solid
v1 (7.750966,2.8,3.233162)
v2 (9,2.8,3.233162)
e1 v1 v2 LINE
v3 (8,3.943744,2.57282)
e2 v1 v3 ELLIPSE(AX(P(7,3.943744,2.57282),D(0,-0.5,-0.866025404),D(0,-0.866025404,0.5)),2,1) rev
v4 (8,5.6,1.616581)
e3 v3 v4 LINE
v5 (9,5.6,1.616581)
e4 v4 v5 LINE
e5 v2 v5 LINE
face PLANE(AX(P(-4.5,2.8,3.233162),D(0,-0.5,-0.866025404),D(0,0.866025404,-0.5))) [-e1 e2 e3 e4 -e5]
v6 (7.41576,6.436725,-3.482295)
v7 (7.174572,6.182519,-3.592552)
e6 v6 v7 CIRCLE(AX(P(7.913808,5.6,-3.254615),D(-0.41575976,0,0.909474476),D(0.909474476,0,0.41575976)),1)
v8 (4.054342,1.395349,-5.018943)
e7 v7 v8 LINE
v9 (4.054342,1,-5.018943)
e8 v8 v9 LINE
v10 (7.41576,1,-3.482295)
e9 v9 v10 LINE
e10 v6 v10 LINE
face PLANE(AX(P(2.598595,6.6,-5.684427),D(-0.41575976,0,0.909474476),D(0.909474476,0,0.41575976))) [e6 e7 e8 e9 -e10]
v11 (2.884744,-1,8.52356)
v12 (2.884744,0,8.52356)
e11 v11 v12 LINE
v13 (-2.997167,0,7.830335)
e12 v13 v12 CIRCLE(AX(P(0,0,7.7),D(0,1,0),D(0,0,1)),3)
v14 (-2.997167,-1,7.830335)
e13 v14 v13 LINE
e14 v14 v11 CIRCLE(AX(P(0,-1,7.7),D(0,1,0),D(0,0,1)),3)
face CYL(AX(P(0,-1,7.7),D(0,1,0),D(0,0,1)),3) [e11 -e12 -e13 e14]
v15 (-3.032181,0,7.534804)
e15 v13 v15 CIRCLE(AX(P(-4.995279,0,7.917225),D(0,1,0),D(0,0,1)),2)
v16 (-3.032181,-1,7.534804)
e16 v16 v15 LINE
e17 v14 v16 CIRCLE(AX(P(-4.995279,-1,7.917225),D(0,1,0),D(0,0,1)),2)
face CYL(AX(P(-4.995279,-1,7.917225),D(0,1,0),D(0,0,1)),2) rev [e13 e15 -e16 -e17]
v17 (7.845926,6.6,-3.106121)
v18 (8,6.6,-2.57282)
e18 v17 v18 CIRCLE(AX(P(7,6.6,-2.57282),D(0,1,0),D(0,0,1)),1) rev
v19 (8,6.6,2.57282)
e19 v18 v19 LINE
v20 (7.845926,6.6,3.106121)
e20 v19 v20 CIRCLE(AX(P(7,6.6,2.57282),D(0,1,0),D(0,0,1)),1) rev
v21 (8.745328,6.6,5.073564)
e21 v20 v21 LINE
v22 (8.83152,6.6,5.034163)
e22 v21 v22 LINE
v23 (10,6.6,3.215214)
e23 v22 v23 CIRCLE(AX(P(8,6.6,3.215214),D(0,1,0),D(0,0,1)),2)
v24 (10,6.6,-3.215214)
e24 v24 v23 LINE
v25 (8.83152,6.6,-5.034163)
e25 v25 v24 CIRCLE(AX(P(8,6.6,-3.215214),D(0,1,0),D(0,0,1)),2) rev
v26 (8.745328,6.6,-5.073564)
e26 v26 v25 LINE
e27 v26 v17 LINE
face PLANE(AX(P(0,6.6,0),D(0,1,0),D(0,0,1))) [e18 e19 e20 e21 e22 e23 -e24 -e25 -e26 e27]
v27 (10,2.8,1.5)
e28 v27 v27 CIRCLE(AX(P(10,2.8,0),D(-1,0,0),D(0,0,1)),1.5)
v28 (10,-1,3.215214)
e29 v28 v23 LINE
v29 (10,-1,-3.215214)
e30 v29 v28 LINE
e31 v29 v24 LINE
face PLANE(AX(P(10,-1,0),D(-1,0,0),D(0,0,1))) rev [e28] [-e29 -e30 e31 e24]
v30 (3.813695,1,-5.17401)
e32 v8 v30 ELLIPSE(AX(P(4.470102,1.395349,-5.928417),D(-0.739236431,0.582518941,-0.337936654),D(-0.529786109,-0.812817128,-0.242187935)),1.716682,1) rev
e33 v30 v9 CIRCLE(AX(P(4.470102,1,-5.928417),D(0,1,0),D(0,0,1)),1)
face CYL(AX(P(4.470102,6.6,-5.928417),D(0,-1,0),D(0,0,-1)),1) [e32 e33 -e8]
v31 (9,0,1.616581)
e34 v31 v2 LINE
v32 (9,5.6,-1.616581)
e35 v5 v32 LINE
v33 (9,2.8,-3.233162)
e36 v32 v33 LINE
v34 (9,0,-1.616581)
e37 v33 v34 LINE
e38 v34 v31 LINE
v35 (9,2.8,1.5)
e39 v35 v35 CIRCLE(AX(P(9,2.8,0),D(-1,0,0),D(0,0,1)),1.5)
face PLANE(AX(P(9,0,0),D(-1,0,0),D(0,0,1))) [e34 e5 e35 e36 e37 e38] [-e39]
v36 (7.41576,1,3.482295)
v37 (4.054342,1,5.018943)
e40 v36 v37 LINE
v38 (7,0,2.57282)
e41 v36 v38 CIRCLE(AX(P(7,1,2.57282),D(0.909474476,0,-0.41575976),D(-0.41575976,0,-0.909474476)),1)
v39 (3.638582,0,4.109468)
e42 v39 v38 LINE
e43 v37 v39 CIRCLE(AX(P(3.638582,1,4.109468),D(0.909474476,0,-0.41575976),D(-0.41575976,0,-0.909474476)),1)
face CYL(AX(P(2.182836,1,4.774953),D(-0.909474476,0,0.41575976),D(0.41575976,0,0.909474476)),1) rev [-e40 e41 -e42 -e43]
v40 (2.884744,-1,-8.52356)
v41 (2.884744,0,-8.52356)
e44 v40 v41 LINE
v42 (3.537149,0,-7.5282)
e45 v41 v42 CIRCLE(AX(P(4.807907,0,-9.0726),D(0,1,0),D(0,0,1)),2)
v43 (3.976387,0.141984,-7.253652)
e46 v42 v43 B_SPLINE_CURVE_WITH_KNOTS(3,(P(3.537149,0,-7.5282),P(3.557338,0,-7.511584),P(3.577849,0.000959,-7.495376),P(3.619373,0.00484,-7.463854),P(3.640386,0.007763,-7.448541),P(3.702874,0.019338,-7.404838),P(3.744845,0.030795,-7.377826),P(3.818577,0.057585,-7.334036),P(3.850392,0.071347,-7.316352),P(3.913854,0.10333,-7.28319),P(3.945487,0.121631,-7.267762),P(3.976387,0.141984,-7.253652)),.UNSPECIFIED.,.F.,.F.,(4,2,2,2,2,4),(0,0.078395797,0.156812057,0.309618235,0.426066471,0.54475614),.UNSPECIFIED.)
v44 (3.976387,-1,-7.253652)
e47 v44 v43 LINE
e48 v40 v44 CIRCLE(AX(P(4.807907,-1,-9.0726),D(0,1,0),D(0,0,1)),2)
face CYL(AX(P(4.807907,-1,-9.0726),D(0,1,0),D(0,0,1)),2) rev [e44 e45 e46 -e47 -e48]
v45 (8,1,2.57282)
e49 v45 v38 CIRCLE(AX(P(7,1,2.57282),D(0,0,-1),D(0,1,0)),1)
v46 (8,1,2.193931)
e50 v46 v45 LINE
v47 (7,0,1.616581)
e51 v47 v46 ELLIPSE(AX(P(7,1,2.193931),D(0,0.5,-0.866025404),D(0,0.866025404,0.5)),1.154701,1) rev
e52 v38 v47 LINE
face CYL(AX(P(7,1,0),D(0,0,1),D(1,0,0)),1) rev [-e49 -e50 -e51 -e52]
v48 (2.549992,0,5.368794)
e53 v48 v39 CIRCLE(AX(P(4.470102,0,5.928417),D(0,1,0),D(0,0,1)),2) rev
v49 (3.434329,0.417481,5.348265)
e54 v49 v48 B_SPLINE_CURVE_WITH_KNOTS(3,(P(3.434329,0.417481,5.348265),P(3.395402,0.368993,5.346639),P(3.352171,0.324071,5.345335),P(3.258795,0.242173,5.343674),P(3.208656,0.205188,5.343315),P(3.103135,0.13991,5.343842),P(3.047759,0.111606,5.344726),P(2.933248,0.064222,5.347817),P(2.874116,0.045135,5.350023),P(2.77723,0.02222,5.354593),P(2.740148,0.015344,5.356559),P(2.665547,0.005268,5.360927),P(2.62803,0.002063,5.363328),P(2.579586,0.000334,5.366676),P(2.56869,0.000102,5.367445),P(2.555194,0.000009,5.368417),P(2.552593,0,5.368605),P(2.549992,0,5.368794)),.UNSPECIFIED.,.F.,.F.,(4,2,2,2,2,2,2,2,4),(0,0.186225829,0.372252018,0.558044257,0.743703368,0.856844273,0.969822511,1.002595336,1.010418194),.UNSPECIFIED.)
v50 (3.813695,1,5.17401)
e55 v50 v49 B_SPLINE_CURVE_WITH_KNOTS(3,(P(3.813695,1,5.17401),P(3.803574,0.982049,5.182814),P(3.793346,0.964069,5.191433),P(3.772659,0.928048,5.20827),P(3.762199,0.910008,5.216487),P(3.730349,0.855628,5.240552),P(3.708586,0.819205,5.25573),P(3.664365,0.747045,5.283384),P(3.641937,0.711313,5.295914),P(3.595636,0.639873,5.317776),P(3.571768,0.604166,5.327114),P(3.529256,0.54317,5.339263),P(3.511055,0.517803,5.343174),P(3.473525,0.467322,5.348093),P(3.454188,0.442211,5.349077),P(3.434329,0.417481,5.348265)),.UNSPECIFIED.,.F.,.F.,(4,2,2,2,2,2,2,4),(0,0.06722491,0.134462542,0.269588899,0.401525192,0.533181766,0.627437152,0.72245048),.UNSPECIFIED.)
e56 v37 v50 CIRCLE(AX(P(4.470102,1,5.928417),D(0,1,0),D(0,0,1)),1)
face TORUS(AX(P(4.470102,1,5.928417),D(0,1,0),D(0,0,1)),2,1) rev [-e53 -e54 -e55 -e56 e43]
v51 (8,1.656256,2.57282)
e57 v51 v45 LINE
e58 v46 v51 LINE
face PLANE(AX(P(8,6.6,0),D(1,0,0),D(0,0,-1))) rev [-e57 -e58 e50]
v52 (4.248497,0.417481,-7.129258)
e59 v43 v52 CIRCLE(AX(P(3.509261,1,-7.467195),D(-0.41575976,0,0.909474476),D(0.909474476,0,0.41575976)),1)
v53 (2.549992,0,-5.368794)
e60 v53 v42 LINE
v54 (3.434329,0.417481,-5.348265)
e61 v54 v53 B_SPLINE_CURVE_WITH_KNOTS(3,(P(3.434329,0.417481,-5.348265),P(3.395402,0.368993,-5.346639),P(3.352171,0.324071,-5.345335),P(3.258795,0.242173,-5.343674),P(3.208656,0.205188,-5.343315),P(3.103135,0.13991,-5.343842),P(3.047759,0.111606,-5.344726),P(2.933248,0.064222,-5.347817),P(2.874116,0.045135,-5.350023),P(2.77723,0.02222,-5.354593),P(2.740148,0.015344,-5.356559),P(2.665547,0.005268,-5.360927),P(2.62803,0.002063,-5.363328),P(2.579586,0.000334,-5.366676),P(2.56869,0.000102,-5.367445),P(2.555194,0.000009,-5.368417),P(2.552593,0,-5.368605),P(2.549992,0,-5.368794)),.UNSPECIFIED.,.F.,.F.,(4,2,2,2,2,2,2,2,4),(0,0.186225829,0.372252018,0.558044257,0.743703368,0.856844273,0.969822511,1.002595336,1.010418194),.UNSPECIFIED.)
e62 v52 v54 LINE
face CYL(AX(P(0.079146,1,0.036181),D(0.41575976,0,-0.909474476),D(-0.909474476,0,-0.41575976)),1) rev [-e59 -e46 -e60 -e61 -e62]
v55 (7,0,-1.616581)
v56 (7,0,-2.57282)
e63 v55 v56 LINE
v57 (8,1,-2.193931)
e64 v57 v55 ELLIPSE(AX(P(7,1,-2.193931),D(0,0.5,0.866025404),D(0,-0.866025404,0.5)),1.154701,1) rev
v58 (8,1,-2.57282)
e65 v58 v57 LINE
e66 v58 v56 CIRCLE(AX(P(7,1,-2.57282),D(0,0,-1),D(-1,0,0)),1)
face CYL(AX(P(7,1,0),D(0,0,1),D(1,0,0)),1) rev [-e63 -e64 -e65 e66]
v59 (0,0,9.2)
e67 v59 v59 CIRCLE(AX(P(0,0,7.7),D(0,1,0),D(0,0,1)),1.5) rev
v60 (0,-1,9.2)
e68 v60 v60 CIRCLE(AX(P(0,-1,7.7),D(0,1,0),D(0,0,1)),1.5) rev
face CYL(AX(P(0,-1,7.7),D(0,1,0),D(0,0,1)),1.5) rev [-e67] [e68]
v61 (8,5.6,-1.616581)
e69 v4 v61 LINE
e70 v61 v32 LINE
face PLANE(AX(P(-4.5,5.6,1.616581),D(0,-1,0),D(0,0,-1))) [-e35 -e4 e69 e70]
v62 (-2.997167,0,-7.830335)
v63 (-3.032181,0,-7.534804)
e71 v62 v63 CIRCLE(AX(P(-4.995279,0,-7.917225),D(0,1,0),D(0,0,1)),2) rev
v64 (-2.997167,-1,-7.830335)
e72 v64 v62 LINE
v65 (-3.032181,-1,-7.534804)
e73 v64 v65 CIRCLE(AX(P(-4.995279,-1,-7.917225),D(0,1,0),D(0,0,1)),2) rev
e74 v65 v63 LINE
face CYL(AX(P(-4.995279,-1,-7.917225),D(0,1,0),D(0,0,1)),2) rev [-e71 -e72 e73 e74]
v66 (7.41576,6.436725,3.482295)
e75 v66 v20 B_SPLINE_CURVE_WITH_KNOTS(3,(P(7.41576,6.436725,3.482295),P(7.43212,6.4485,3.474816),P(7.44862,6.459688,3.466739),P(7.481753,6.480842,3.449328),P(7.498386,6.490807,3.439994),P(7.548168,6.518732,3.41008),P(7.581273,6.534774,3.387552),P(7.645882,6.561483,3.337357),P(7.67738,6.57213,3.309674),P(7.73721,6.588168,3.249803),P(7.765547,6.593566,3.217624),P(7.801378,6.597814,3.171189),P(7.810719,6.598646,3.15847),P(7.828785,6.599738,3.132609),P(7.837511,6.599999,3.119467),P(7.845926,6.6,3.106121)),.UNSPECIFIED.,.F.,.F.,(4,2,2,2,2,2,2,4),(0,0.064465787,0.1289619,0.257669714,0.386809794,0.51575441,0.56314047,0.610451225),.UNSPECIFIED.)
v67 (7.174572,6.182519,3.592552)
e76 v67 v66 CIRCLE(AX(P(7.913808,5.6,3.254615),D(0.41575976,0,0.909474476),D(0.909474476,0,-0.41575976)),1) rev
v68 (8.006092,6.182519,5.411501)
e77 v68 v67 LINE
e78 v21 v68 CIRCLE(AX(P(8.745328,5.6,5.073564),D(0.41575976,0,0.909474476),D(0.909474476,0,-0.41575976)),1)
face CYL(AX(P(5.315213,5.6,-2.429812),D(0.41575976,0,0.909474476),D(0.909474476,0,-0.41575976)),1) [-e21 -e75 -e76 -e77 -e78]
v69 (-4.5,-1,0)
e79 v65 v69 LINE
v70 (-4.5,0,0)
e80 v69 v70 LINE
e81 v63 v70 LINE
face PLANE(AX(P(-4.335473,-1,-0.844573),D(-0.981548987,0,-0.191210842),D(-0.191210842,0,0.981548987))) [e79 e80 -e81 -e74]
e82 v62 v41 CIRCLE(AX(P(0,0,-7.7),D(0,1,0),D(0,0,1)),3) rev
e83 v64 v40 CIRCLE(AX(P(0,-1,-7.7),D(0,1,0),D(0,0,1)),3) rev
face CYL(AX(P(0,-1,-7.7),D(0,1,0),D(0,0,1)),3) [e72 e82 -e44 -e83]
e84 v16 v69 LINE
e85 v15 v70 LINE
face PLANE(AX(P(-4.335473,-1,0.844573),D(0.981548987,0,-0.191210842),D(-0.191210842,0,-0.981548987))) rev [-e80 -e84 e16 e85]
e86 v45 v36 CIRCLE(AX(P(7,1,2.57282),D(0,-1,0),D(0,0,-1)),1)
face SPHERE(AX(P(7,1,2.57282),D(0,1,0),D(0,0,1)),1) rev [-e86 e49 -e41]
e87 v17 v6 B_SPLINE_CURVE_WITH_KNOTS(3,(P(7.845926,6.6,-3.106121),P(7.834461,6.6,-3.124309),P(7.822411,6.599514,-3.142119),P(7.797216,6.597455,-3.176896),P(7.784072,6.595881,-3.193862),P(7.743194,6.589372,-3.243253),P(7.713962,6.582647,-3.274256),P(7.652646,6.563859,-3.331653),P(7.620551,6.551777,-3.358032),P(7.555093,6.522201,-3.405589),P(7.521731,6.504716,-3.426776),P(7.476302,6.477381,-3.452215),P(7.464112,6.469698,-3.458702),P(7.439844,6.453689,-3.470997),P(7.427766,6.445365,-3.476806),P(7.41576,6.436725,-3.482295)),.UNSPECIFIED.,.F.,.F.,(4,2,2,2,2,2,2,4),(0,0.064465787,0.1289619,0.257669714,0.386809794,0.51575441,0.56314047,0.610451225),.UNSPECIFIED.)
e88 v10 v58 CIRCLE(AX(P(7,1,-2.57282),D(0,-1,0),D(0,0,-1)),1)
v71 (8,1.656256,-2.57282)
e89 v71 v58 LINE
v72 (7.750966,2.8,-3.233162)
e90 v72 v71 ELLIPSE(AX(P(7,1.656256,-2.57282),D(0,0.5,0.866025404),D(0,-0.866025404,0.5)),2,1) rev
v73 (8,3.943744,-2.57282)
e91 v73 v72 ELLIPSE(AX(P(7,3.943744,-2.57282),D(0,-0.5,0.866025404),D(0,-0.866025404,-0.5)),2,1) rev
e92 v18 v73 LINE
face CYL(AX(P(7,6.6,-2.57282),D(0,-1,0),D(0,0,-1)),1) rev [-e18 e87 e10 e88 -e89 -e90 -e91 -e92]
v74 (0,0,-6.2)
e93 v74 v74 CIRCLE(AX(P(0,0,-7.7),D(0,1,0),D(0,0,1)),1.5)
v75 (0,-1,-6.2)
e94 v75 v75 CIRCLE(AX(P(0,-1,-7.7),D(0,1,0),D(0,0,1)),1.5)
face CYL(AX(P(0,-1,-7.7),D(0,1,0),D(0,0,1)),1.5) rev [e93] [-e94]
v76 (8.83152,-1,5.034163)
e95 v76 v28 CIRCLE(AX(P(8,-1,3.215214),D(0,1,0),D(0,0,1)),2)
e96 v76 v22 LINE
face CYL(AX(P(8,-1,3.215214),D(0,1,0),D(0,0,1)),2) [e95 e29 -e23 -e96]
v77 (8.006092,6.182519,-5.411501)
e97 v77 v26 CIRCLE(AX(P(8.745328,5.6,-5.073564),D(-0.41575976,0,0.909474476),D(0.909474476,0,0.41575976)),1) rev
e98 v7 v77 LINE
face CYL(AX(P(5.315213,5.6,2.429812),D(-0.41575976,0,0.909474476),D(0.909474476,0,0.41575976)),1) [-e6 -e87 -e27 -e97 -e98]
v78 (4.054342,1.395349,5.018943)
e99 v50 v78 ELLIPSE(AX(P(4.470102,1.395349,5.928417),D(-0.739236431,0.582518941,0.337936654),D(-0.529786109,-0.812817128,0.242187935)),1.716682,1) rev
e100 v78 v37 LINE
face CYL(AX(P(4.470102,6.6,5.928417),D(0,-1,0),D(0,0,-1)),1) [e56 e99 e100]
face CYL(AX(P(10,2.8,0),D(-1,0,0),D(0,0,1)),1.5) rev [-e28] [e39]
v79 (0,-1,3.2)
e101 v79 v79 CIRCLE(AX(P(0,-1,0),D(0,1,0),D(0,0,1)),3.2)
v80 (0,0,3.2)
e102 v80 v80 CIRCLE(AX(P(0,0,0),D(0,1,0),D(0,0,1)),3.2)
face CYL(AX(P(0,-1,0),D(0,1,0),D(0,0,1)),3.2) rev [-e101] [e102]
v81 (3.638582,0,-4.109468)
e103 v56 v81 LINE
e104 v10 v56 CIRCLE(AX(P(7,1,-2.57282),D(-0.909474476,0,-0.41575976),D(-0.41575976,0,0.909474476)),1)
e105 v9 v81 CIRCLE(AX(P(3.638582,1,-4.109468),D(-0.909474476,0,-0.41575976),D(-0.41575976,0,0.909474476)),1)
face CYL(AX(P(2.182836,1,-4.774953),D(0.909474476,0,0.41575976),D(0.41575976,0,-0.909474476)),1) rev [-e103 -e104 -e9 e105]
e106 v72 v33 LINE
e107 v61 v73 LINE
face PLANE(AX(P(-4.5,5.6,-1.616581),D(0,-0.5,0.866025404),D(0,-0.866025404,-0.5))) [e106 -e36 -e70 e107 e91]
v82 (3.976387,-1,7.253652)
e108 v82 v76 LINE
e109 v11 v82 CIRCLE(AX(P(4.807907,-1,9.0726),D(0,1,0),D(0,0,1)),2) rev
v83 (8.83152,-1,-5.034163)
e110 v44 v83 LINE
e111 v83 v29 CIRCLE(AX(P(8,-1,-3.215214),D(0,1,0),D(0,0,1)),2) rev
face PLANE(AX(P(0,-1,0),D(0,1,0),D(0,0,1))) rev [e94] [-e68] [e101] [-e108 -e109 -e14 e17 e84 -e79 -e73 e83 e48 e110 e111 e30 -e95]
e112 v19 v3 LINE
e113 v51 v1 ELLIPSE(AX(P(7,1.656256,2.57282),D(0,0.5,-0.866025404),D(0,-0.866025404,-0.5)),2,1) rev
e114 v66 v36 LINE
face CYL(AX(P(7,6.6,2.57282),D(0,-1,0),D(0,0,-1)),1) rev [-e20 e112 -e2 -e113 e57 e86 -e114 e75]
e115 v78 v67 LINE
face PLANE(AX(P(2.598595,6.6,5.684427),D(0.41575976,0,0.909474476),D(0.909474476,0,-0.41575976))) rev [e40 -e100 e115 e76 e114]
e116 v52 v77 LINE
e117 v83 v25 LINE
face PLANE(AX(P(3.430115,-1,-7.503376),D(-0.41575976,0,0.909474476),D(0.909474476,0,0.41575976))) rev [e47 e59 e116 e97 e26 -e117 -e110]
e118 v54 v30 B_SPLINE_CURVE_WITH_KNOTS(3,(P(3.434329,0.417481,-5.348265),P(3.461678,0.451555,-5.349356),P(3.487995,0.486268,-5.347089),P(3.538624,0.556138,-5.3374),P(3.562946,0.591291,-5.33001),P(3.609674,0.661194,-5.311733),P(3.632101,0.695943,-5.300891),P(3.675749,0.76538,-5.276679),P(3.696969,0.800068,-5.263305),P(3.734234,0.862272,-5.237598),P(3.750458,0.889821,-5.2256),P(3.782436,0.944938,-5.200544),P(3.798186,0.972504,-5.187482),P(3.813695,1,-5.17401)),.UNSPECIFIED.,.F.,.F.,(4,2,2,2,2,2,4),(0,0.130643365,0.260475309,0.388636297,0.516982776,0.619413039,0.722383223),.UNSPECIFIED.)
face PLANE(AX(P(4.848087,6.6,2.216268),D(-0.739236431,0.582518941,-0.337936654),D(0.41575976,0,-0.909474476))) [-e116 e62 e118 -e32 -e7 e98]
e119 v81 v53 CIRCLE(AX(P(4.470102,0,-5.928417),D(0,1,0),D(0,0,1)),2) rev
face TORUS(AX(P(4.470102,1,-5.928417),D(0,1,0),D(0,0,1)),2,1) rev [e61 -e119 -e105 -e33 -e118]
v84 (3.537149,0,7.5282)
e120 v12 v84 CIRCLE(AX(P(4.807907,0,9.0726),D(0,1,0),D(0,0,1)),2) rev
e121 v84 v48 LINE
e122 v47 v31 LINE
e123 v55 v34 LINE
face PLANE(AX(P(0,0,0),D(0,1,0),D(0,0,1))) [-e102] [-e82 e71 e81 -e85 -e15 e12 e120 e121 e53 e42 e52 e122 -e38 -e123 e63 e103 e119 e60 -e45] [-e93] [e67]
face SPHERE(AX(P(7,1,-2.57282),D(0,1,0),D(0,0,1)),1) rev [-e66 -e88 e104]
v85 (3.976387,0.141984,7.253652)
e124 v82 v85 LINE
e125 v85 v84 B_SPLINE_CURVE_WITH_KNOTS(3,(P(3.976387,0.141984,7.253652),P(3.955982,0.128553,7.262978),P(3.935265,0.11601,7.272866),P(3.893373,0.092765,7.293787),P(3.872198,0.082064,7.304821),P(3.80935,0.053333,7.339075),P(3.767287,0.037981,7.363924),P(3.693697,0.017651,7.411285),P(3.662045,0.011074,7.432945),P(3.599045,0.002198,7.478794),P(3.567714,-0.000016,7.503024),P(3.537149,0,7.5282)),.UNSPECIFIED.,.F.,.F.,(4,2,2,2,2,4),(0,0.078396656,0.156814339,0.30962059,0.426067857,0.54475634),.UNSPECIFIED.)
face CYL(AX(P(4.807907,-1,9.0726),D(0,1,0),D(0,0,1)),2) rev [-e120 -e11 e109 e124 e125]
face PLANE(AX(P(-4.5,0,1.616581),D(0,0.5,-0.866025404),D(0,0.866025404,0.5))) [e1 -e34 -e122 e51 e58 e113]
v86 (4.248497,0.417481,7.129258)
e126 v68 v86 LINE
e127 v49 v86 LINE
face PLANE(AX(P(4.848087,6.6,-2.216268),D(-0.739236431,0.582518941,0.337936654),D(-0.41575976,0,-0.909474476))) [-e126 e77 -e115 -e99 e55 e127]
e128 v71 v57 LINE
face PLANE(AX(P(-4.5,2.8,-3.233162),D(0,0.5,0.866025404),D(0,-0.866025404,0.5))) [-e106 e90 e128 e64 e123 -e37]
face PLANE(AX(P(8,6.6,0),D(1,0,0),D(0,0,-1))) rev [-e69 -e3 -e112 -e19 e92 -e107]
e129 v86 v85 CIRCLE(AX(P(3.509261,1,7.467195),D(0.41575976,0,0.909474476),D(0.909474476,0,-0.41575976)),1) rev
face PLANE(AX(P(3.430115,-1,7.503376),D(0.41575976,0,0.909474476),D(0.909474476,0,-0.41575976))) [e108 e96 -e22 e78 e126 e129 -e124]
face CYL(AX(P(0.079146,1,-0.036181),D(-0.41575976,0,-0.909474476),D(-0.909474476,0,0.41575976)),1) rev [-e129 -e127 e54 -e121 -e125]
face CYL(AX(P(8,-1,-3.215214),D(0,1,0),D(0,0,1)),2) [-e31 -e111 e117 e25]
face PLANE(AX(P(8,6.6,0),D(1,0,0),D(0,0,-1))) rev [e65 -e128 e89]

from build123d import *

# Parameters (mm, degrees)
ESQUISSE1_R                  = 3.2
ESQUISSE1_R_2                = 1.5
BOSS_EXTRU_1_DEPTH           = 1
BOSS_EXTRU_2_START           = 6.6
BOSS_EXTRU_2_DEPTH           = 6.6
CHANFREIN1_SIZE              = 6.6
CHANFREIN1_SIZE_2            = 4.73
CONG_1_R                     = 1
ENL_V_MAT_EXTRU_1_DEPTH      = 18.728508153
ENL_V_MAT_EXTRU_1_DEPTH_BACK = 1
ENL_V_MAT_EXTRU_2_DEPTH      = 18.728508153
ENL_V_MAT_EXTRU_2_DEPTH_BACK = 18.728508153
ESQUISSE2_3_R                = 1.5


with BuildPart() as part:
    # Esquisse1 → Boss.-Extru.1 (new body)
    # profile 1 of 2: a face of its own
    with BuildSketch(Plane(origin=(0, 0, 0), x_dir=(1, 0, 0), z_dir=(0, 1, 0))):
        with BuildLine():
            Line((7.41575976, 3.482294806), (4.054342249, 5.018942811))
            ThreePointArc((4.054342249, 5.018942811), (3.533019895, 5.579308264), (3.560627534, 6.344177047))
            Line((3.560627534, 6.344177047), (3.976387294, 7.253651523))
            ThreePointArc((3.976387294, 7.253651523), (3.291254041, 7.768850358), (2.884744089, 8.523560284))
            ThreePointArc((2.884744089, 8.523560284), (-0.351141019, 10.679379127), (-2.997167453, 7.830335178))
            ThreePointArc((-2.997167453, 7.830335178), (-3.009169797, 7.681917242), (-3.032181114, 7.534803614))
            Line((-3.032181114, 7.534803614), (-4.5, 0))
            Line((-4.5, 0), (-3.032181114, -7.534803614))
            ThreePointArc((-3.032181114, -7.534803614), (-3.009169797, -7.681917242), (-2.997167453, -7.830335178))
            ThreePointArc((-2.997167453, -7.830335178), (-0.351141019, -10.679379127), (2.884744089, -8.523560284))
            ThreePointArc((2.884744089, -8.523560284), (3.291254041, -7.768850358), (3.976387294, -7.253651523))
            Line((3.976387294, -7.253651523), (3.560627534, -6.344177047))
            ThreePointArc((3.560627534, -6.344177047), (3.533019895, -5.579308264), (4.054342249, -5.018942811))
            Line((4.054342249, -5.018942811), (7.41575976, -3.482294806))
            ThreePointArc((7.41575976, -3.482294806), (7.841355977, -3.113301708), (8, -2.572820331))
            Line((8, -2.572820331), (8, 2.572820331))
            ThreePointArc((8, 2.572820331), (7.841355977, 3.113301708), (7.41575976, 3.482294806))
        make_face()
        with Locations(Location((0, 0, 0), (0, 0, 270))):
            Circle(ESQUISSE1_R, mode=Mode.SUBTRACT)
        with Locations(Location((0, 7.7, 0), (0, 0, 270))):
            Circle(ESQUISSE1_R_2, mode=Mode.SUBTRACT)
        with Locations(Location((0, -7.7, 0), (0, 0, 270))):
            Circle(ESQUISSE1_R_2, mode=Mode.SUBTRACT)
    # profile 2 of 2: a face of its own
    with BuildSketch(Plane(origin=(0, 0, 0), x_dir=(1, 0, 0), z_dir=(0, 1, 0))):
        with BuildLine():
            ThreePointArc((4.054342249, 5.018942811), (3.533019895, 5.579308264), (3.560627534, 6.344177047))
            Line((3.560627534, 6.344177047), (3.976387294, 7.253651523))
            Line((3.976387294, 7.253651523), (8.831519521, 5.034162505))
            ThreePointArc((8.831519521, 5.034162505), (9.682711954, 4.29617631), (10, 3.215213554))
            Line((10, 3.215213554), (10, -3.215213554))
            ThreePointArc((10, -3.215213554), (9.682711954, -4.29617631), (8.831519521, -5.034162505))
            Line((8.831519521, -5.034162505), (3.976387294, -7.253651523))
            Line((3.976387294, -7.253651523), (3.560627534, -6.344177047))
            ThreePointArc((3.560627534, -6.344177047), (3.533019895, -5.579308264), (4.054342249, -5.018942811))
            Line((4.054342249, -5.018942811), (7.41575976, -3.482294806))
            ThreePointArc((7.41575976, -3.482294806), (7.841355977, -3.113301708), (8, -2.572820331))
            Line((8, -2.572820331), (8, 2.572820331))
            ThreePointArc((8, 2.572820331), (7.841355977, 3.113301708), (7.41575976, 3.482294806))
            Line((7.41575976, 3.482294806), (4.054342249, 5.018942811))
        make_face()
    extrude(amount=-BOSS_EXTRU_1_DEPTH)

    # Esquisse1<3> → Boss.-Extru.2 (add)
    with BuildSketch(Plane(origin=(0, 0, 0), x_dir=(1, 0, 0), z_dir=(0, 1, 0)).offset(BOSS_EXTRU_2_START)):
        with BuildLine():
            ThreePointArc((4.054342249, 5.018942811), (3.533019895, 5.579308264), (3.560627534, 6.344177047))
            Line((3.560627534, 6.344177047), (3.976387294, 7.253651523))
            Line((3.976387294, 7.253651523), (8.831519521, 5.034162505))
            ThreePointArc((8.831519521, 5.034162505), (9.682711954, 4.29617631), (10, 3.215213554))
            Line((10, 3.215213554), (10, -3.215213554))
            ThreePointArc((10, -3.215213554), (9.682711954, -4.29617631), (8.831519521, -5.034162505))
            Line((8.831519521, -5.034162505), (3.976387294, -7.253651523))
            Line((3.976387294, -7.253651523), (3.560627534, -6.344177047))
            ThreePointArc((3.560627534, -6.344177047), (3.533019895, -5.579308264), (4.054342249, -5.018942811))
            Line((4.054342249, -5.018942811), (7.41575976, -3.482294806))
            ThreePointArc((7.41575976, -3.482294806), (7.841355977, -3.113301708), (8, -2.572820331))
            Line((8, -2.572820331), (8, 2.572820331))
            ThreePointArc((8, 2.572820331), (7.841355977, 3.113301708), (7.41575976, 3.482294806))
            Line((7.41575976, 3.482294806), (4.054342249, 5.018942811))
        make_face()
    extrude(amount=-BOSS_EXTRU_2_DEPTH)

    # Chanfrein1
    # the kernel refuses this chamfer: 6.6, 4.73 mm, written as the material it takes off along each edge
    with BuildSketch(Plane(origin=(11.061264904, 6.6, 22.751821295), x_dir=(-0.020518924966706303, -0.9997454615139245, 0.009380079984775464), z_dir=(-0.4157597602676271, 0, -0.9094744755858766))) as chanfrein1_piece_1_section:
        Polygon((CHANFREIN1_SIZE * 0.999745461514, -CHANFREIN1_SIZE * 0.0225612983294), (-CHANFREIN1_SIZE_2 * 0.0225612983294, -CHANFREIN1_SIZE_2 * 0.999745461514), (0, 0), align=None)
    chanfrein1_piece_1 = extrude(amount=35.081593686, mode=Mode.PRIVATE)
    chanfrein1_piece_1 = split(chanfrein1_piece_1, bisect_by=Plane(origin=(5.170241743, 0, 6.158121449), z_dir=(0, 1, 0)), keep=Keep.TOP, mode=Mode.PRIVATE)
    add(chanfrein1_piece_1, mode=Mode.SUBTRACT)
    with BuildSketch(Plane(origin=(-3.524250076, 6.6, 9.153992725), x_dir=(-0.0205189249667065, -0.9997454615139245, -0.009380079984775552), z_dir=(0.4157597602676271, 0, -0.9094744755858766))) as chanfrein1_piece_2_section:
        Polygon((CHANFREIN1_SIZE * 0.999745461514, -CHANFREIN1_SIZE * 0.0225612983294), (-CHANFREIN1_SIZE_2 * 0.0225612983294, -CHANFREIN1_SIZE_2 * 0.999745461514), (0, 0), align=None)
    chanfrein1_piece_2 = extrude(amount=35.081593686, mode=Mode.PRIVATE)
    chanfrein1_piece_2 = split(chanfrein1_piece_2, bisect_by=Plane(origin=(5.170241743, 0, -6.158121449), z_dir=(0, 1, 0)), keep=Keep.TOP, mode=Mode.PRIVATE)
    add(chanfrein1_piece_2, mode=Mode.SUBTRACT)

    # Congé1
    cong_1_edges = [part.edges().sort_by_distance(p)[0] for p in [
        (7.862321613, 6.6, 4.377370464),
        (7.862321613, 6.6, -4.377370464),
        (3.768507414, 0, 6.798914285),
        (5.735051005, 0, 4.250618809),
        (7.841355977, 0, 3.113301708),
        (8, 0, 0),
        (7.841355977, 0, -3.113301708),
        (5.735051005, 0, -4.250618809),
        (3.768507414, 0, -6.798914285),
    ]]
    fillet(cong_1_edges, radius=CONG_1_R)

    # Esquisse2 → Enlèv. mat.-Extru.1 (cut, two sides: drawn at the far end of the back side and taken through both)
    with BuildSketch(Plane.ZY.offset(-8).offset(-ENL_V_MAT_EXTRU_1_DEPTH_BACK)):
        Polygon((3.233161507, 2.8), (1.616580754, 5.6), (-1.616580754, 5.6), (-3.233161507, 2.8), (-1.616580754, 0), (1.616580754, 0), align=None)
    extrude(amount=ENL_V_MAT_EXTRU_1_DEPTH + ENL_V_MAT_EXTRU_1_DEPTH_BACK, mode=Mode.SUBTRACT)

    # Esquisse2<3> → Enlèv. mat.-Extru.2 (cut, two sides: drawn at the far end of the back side and taken through both)
    with BuildSketch(Plane.ZY.offset(-8).offset(-ENL_V_MAT_EXTRU_2_DEPTH_BACK)):
        with Locations((0, 2.8)):
            Circle(ESQUISSE2_3_R)
    extrude(amount=ENL_V_MAT_EXTRU_2_DEPTH + ENL_V_MAT_EXTRU_2_DEPTH_BACK, mode=Mode.SUBTRACT)


solid = part.part
